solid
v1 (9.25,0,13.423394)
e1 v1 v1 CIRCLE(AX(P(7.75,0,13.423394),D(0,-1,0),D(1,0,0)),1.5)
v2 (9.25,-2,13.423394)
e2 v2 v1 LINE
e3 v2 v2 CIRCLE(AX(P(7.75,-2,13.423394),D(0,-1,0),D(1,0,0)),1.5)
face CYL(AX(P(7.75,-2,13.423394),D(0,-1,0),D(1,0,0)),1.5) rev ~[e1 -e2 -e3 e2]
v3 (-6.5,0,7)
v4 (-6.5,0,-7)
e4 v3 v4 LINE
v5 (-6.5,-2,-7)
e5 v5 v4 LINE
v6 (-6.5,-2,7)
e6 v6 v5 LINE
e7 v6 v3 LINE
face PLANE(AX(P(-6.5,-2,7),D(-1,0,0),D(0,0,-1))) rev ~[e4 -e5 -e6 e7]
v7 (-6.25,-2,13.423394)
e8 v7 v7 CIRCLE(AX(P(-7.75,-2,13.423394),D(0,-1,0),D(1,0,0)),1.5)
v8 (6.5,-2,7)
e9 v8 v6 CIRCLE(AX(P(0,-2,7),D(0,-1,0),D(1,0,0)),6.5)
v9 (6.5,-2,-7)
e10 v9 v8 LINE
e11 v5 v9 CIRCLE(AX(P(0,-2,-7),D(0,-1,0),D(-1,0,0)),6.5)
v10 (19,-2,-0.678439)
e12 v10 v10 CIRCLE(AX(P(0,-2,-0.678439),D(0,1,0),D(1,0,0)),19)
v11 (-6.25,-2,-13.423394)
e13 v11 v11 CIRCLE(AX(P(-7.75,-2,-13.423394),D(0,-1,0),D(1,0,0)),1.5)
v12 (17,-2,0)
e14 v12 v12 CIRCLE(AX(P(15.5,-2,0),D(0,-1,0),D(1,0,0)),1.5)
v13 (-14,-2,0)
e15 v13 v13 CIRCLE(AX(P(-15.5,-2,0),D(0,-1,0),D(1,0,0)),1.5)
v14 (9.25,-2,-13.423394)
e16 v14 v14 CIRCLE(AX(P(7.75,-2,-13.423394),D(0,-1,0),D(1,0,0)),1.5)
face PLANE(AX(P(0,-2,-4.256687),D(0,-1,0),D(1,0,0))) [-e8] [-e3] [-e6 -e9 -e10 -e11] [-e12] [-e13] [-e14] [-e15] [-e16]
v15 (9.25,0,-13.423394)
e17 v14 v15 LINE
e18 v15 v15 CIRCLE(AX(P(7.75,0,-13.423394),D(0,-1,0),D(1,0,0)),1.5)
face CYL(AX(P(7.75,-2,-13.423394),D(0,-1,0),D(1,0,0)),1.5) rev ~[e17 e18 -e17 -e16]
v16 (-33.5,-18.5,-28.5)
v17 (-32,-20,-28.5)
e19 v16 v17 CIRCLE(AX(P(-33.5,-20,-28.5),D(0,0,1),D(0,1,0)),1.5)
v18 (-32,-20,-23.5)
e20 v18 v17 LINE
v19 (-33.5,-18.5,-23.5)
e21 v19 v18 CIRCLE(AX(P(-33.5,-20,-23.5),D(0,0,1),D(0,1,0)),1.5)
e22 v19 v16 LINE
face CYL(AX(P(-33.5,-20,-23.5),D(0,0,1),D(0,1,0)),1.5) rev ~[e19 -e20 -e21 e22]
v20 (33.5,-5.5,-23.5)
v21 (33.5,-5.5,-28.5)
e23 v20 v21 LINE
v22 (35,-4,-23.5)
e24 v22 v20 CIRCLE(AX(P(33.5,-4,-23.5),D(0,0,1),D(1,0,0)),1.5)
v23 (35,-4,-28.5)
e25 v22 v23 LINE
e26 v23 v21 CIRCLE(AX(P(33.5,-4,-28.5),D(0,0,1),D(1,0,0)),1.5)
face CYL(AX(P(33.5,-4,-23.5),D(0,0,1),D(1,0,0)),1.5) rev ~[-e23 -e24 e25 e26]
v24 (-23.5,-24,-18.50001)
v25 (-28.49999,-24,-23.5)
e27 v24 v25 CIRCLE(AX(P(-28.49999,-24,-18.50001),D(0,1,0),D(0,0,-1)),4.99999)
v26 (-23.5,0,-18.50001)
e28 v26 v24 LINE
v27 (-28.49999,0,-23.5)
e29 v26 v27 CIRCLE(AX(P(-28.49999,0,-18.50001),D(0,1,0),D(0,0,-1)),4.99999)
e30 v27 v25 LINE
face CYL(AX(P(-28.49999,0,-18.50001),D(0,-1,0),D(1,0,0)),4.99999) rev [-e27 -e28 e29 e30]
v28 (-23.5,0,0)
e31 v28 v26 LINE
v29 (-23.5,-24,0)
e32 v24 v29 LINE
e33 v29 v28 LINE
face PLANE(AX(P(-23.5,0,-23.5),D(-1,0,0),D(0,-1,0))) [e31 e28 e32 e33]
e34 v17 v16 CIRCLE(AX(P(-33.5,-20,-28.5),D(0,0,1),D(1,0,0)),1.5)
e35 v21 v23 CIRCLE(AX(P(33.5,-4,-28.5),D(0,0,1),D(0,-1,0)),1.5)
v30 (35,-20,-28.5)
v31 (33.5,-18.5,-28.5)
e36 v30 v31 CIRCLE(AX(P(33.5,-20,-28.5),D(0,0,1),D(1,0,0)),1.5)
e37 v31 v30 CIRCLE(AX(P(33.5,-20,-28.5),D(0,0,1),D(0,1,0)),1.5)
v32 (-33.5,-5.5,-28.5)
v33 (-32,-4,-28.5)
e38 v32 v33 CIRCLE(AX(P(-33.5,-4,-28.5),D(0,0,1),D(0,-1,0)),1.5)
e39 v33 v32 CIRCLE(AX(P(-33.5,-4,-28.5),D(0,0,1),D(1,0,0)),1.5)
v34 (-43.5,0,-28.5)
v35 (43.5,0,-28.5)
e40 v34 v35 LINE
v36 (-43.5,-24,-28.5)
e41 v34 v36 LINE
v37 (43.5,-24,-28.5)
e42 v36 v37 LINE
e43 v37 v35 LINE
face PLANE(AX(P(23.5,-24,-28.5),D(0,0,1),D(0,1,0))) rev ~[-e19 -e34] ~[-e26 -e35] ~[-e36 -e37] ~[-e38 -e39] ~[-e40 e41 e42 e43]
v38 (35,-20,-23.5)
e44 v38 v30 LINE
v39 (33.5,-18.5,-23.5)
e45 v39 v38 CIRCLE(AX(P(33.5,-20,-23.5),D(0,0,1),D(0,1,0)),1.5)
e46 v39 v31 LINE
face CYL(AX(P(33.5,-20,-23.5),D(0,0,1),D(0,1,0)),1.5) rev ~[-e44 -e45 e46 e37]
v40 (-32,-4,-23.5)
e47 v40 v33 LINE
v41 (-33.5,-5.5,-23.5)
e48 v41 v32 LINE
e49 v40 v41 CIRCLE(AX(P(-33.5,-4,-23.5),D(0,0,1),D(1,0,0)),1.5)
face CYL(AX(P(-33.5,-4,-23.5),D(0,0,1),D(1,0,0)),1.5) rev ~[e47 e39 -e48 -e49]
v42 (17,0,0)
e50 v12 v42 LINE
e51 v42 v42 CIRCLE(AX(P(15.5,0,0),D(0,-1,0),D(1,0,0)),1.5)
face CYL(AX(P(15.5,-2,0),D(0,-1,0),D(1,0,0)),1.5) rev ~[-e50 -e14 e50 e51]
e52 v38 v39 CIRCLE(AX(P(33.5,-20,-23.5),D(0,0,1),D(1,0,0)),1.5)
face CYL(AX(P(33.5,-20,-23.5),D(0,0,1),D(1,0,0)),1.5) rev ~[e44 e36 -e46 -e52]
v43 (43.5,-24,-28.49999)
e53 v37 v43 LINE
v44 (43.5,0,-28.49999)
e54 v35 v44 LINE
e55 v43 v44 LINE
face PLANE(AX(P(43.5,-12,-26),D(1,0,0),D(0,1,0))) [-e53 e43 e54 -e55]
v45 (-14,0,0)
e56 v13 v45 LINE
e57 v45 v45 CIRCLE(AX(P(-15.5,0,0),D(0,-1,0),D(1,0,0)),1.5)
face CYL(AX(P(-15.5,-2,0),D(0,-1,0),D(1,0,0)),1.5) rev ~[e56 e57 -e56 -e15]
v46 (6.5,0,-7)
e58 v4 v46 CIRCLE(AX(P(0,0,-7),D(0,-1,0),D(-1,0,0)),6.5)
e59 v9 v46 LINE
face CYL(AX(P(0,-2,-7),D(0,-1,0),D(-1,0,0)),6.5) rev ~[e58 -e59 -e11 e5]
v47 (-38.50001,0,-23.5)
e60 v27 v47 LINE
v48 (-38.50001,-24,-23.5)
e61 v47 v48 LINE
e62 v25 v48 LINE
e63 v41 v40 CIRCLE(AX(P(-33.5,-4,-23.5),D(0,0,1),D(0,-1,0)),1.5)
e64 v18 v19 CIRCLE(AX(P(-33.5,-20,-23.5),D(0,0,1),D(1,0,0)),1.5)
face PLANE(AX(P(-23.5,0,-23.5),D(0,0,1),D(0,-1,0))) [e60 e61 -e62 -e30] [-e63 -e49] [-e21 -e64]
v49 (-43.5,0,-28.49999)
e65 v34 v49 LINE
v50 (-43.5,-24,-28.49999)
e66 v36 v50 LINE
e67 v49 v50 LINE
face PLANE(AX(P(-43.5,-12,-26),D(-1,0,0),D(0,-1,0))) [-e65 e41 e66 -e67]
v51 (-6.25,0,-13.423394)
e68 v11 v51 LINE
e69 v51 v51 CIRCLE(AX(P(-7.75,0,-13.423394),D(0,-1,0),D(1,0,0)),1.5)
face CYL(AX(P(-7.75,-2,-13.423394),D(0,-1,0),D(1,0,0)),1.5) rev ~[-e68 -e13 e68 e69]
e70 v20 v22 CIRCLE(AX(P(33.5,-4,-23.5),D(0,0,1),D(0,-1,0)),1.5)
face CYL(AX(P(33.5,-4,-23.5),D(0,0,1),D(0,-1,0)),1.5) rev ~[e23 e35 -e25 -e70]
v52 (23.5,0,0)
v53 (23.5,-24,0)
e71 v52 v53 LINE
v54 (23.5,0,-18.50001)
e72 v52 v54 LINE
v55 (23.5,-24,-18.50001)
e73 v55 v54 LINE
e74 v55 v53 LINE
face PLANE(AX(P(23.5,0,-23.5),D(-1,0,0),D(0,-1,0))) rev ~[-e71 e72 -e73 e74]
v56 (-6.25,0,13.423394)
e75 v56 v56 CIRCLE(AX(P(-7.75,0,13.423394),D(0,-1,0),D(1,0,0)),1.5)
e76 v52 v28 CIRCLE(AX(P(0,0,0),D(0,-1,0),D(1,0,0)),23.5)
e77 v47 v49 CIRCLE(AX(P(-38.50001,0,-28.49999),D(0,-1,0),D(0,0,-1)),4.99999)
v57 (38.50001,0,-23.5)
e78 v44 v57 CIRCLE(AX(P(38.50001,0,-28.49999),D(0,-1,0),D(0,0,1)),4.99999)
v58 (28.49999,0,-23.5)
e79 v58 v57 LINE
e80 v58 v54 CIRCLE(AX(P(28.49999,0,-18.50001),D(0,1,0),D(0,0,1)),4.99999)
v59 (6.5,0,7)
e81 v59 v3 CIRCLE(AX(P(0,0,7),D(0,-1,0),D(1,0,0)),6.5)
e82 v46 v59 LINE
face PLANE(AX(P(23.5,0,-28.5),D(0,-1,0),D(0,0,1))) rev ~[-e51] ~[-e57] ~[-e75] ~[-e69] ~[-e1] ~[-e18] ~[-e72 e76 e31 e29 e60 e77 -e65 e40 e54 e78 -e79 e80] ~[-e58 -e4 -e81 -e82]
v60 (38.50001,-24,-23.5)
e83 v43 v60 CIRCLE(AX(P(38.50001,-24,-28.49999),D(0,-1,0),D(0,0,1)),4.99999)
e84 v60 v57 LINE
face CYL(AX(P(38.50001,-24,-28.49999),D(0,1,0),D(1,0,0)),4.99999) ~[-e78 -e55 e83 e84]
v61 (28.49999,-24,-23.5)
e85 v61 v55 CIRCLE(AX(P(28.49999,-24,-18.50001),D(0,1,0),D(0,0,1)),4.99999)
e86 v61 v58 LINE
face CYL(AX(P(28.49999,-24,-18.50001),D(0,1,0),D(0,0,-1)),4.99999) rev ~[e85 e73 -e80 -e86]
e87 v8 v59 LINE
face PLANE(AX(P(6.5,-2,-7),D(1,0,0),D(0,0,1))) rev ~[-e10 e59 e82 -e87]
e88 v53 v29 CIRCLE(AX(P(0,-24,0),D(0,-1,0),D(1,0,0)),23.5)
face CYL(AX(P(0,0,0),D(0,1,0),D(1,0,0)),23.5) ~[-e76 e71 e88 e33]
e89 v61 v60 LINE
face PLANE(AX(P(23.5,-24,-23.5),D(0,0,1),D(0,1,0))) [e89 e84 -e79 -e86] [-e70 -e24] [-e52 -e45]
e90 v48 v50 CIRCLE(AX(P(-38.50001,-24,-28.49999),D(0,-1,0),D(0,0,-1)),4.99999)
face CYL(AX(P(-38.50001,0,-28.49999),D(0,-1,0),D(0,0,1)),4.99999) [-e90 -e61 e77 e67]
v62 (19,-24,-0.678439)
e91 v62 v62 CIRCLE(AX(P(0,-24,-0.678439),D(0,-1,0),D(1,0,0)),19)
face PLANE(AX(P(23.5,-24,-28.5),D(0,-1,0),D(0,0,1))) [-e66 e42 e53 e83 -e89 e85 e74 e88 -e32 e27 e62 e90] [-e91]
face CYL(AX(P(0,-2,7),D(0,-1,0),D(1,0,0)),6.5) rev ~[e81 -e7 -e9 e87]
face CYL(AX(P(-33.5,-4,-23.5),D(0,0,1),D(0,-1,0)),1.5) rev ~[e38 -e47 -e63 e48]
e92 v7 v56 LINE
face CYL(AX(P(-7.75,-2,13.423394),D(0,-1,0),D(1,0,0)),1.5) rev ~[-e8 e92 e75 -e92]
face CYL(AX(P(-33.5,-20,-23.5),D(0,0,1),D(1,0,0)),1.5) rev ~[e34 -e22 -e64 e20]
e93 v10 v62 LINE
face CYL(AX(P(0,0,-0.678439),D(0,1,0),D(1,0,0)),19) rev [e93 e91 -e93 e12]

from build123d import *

# Parameters (mm, degrees)
F1_DEPTH  = 2
F2_R      = 1.5
F3_DEPTH  = 5
F4_R      = 19
F5_DEPTH  = 24
F6_W      = 47
F6_H      = 24
F7_DEPTH  = 5
F8_W      = 24
F8_H      = 5
F9_DEPTH  = 20
F11_DEPTH = 25
F12_W     = 24
F12_H     = 5
F13_DEPTH = 20
F15_DEPTH = 25
F16_R     = 4.99999


# Not quite as in the source:
# - a fillet or chamfer is up to 0.001 mm smaller than in the source, because OpenCascade refuses the exact size


with BuildPart() as f1:
    # F0 (on Front) → F1 (new body)
    with BuildSketch(Plane.XZ):
        with BuildLine():
            Line((-23.5, -23.5), (0, -23.5))
            Line((0, -23.5), (23.5, -23.5))
            Line((23.5, -23.5), (23.5, 0))
            ThreePointArc((23.5, 0), (0, 23.5), (-23.5, 0))
            Line((-23.5, 0), (-23.5, -23.5))
        make_face()
    extrude(amount=F1_DEPTH)

    # F2 (on face) → F3 (cut)
    with BuildSketch(Plane.XZ.offset(2)):
        with Locations((15.5, 0)):
            Circle(F2_R)
        with Locations((7.75, 13.4233937587)):
            Circle(F2_R)
        with Locations((-7.75, 13.4233937587)):
            Circle(F2_R)
        with Locations((-15.5, 0)):
            Circle(F2_R)
        with Locations((-7.75, -13.4233937587)):
            Circle(F2_R)
        with Locations((7.75, -13.4233937587)):
            Circle(F2_R)
        with BuildLine():
            Line((6.5, -7), (6.5, 7))
            ThreePointArc((6.5, 7), (0, 13.5), (-6.5, 7))
            Line((-6.5, 7), (-6.5, -7))
            ThreePointArc((-6.5, -7), (0, -13.5), (6.5, -7))
        make_face()
    extrude(amount=-F3_DEPTH, mode=Mode.SUBTRACT)

    # F4 (on Front) → F5 (join)
    with BuildSketch(Plane.XZ):
        with BuildLine():
            ThreePointArc((23.5, 0), (0, 23.5), (-23.5, 0))
            Line((-23.5, 0), (-23.5, -23.5))
            Line((-23.5, -23.5), (23.5, -23.5))
            Line((23.5, -23.5), (23.5, 0))
        make_face()
        with Locations((0, -0.6784388353)):
            Circle(F4_R, mode=Mode.SUBTRACT)
    extrude(amount=F5_DEPTH)

    # F6 (on face) → F7 (join)
    with BuildSketch(Plane(origin=(0, 0, -23.5), x_dir=(1, 0, 0), z_dir=(0, 0, -1))):
        with Locations((0, 12)):
            Rectangle(F6_W, F6_H)
    extrude(amount=F7_DEPTH)

    # F8 (on face) → F9 (join)
    with BuildSketch(Plane(origin=(-23.5, 0, 0), x_dir=(0, -1, 0), z_dir=(-1, 0, 0))):
        with Locations((12, -26)):
            Rectangle(F8_W, F8_H)
    extrude(amount=F9_DEPTH)

    # F10 (on face) → F11 (cut)
    with BuildSketch(Plane.XY.offset(-23.5)):
        with BuildLine():
            ThreePointArc((-32, -4), (-34.5606601718, -2.9393398282), (-33.5, -5.5))
            ThreePointArc((-33.5, -5.5), (-32.4393398282, -5.0606601718), (-32, -4))
        make_face()
        with BuildLine():
            ThreePointArc((-32, -20), (-32.4393398282, -18.9393398282), (-33.5, -18.5))
            ThreePointArc((-33.5, -18.5), (-34.5606601718, -21.0606601718), (-32, -20))
        make_face()
    extrude(amount=-F11_DEPTH, mode=Mode.SUBTRACT)

    # F12 (on face) → F13 (join)
    with BuildSketch(Plane.YZ.offset(23.5)):
        with Locations((-12, -26)):
            Rectangle(F12_W, F12_H)
    extrude(amount=F13_DEPTH)

    # F14 (on face) → F15 (cut)
    with BuildSketch(Plane.XY.offset(-23.5)):
        with BuildLine():
            ThreePointArc((35, -4), (32.4393398282, -2.9393398282), (33.5, -5.5))
            ThreePointArc((33.5, -5.5), (34.5606601718, -5.0606601718), (35, -4))
        make_face()
        with BuildLine():
            ThreePointArc((35, -20), (34.5606601718, -18.9393398282), (33.5, -18.5))
            ThreePointArc((33.5, -18.5), (32.4393398282, -21.0606601718), (35, -20))
        make_face()
    extrude(amount=-F15_DEPTH, mode=Mode.SUBTRACT)

    # F16 (radius 5 in the source; OpenCascade refuses exactly that, so slightly less here)
    f16_edges = [f1.edges().sort_by_distance(p)[0] for p in [
        (23.5, -12, -23.5),
        (43.5, -12, -23.5),
        (-23.5, -12, -23.5),
        (-43.5, -12, -23.5),
    ]]
    fillet(f16_edges, radius=F16_R)


solid = f1.part
